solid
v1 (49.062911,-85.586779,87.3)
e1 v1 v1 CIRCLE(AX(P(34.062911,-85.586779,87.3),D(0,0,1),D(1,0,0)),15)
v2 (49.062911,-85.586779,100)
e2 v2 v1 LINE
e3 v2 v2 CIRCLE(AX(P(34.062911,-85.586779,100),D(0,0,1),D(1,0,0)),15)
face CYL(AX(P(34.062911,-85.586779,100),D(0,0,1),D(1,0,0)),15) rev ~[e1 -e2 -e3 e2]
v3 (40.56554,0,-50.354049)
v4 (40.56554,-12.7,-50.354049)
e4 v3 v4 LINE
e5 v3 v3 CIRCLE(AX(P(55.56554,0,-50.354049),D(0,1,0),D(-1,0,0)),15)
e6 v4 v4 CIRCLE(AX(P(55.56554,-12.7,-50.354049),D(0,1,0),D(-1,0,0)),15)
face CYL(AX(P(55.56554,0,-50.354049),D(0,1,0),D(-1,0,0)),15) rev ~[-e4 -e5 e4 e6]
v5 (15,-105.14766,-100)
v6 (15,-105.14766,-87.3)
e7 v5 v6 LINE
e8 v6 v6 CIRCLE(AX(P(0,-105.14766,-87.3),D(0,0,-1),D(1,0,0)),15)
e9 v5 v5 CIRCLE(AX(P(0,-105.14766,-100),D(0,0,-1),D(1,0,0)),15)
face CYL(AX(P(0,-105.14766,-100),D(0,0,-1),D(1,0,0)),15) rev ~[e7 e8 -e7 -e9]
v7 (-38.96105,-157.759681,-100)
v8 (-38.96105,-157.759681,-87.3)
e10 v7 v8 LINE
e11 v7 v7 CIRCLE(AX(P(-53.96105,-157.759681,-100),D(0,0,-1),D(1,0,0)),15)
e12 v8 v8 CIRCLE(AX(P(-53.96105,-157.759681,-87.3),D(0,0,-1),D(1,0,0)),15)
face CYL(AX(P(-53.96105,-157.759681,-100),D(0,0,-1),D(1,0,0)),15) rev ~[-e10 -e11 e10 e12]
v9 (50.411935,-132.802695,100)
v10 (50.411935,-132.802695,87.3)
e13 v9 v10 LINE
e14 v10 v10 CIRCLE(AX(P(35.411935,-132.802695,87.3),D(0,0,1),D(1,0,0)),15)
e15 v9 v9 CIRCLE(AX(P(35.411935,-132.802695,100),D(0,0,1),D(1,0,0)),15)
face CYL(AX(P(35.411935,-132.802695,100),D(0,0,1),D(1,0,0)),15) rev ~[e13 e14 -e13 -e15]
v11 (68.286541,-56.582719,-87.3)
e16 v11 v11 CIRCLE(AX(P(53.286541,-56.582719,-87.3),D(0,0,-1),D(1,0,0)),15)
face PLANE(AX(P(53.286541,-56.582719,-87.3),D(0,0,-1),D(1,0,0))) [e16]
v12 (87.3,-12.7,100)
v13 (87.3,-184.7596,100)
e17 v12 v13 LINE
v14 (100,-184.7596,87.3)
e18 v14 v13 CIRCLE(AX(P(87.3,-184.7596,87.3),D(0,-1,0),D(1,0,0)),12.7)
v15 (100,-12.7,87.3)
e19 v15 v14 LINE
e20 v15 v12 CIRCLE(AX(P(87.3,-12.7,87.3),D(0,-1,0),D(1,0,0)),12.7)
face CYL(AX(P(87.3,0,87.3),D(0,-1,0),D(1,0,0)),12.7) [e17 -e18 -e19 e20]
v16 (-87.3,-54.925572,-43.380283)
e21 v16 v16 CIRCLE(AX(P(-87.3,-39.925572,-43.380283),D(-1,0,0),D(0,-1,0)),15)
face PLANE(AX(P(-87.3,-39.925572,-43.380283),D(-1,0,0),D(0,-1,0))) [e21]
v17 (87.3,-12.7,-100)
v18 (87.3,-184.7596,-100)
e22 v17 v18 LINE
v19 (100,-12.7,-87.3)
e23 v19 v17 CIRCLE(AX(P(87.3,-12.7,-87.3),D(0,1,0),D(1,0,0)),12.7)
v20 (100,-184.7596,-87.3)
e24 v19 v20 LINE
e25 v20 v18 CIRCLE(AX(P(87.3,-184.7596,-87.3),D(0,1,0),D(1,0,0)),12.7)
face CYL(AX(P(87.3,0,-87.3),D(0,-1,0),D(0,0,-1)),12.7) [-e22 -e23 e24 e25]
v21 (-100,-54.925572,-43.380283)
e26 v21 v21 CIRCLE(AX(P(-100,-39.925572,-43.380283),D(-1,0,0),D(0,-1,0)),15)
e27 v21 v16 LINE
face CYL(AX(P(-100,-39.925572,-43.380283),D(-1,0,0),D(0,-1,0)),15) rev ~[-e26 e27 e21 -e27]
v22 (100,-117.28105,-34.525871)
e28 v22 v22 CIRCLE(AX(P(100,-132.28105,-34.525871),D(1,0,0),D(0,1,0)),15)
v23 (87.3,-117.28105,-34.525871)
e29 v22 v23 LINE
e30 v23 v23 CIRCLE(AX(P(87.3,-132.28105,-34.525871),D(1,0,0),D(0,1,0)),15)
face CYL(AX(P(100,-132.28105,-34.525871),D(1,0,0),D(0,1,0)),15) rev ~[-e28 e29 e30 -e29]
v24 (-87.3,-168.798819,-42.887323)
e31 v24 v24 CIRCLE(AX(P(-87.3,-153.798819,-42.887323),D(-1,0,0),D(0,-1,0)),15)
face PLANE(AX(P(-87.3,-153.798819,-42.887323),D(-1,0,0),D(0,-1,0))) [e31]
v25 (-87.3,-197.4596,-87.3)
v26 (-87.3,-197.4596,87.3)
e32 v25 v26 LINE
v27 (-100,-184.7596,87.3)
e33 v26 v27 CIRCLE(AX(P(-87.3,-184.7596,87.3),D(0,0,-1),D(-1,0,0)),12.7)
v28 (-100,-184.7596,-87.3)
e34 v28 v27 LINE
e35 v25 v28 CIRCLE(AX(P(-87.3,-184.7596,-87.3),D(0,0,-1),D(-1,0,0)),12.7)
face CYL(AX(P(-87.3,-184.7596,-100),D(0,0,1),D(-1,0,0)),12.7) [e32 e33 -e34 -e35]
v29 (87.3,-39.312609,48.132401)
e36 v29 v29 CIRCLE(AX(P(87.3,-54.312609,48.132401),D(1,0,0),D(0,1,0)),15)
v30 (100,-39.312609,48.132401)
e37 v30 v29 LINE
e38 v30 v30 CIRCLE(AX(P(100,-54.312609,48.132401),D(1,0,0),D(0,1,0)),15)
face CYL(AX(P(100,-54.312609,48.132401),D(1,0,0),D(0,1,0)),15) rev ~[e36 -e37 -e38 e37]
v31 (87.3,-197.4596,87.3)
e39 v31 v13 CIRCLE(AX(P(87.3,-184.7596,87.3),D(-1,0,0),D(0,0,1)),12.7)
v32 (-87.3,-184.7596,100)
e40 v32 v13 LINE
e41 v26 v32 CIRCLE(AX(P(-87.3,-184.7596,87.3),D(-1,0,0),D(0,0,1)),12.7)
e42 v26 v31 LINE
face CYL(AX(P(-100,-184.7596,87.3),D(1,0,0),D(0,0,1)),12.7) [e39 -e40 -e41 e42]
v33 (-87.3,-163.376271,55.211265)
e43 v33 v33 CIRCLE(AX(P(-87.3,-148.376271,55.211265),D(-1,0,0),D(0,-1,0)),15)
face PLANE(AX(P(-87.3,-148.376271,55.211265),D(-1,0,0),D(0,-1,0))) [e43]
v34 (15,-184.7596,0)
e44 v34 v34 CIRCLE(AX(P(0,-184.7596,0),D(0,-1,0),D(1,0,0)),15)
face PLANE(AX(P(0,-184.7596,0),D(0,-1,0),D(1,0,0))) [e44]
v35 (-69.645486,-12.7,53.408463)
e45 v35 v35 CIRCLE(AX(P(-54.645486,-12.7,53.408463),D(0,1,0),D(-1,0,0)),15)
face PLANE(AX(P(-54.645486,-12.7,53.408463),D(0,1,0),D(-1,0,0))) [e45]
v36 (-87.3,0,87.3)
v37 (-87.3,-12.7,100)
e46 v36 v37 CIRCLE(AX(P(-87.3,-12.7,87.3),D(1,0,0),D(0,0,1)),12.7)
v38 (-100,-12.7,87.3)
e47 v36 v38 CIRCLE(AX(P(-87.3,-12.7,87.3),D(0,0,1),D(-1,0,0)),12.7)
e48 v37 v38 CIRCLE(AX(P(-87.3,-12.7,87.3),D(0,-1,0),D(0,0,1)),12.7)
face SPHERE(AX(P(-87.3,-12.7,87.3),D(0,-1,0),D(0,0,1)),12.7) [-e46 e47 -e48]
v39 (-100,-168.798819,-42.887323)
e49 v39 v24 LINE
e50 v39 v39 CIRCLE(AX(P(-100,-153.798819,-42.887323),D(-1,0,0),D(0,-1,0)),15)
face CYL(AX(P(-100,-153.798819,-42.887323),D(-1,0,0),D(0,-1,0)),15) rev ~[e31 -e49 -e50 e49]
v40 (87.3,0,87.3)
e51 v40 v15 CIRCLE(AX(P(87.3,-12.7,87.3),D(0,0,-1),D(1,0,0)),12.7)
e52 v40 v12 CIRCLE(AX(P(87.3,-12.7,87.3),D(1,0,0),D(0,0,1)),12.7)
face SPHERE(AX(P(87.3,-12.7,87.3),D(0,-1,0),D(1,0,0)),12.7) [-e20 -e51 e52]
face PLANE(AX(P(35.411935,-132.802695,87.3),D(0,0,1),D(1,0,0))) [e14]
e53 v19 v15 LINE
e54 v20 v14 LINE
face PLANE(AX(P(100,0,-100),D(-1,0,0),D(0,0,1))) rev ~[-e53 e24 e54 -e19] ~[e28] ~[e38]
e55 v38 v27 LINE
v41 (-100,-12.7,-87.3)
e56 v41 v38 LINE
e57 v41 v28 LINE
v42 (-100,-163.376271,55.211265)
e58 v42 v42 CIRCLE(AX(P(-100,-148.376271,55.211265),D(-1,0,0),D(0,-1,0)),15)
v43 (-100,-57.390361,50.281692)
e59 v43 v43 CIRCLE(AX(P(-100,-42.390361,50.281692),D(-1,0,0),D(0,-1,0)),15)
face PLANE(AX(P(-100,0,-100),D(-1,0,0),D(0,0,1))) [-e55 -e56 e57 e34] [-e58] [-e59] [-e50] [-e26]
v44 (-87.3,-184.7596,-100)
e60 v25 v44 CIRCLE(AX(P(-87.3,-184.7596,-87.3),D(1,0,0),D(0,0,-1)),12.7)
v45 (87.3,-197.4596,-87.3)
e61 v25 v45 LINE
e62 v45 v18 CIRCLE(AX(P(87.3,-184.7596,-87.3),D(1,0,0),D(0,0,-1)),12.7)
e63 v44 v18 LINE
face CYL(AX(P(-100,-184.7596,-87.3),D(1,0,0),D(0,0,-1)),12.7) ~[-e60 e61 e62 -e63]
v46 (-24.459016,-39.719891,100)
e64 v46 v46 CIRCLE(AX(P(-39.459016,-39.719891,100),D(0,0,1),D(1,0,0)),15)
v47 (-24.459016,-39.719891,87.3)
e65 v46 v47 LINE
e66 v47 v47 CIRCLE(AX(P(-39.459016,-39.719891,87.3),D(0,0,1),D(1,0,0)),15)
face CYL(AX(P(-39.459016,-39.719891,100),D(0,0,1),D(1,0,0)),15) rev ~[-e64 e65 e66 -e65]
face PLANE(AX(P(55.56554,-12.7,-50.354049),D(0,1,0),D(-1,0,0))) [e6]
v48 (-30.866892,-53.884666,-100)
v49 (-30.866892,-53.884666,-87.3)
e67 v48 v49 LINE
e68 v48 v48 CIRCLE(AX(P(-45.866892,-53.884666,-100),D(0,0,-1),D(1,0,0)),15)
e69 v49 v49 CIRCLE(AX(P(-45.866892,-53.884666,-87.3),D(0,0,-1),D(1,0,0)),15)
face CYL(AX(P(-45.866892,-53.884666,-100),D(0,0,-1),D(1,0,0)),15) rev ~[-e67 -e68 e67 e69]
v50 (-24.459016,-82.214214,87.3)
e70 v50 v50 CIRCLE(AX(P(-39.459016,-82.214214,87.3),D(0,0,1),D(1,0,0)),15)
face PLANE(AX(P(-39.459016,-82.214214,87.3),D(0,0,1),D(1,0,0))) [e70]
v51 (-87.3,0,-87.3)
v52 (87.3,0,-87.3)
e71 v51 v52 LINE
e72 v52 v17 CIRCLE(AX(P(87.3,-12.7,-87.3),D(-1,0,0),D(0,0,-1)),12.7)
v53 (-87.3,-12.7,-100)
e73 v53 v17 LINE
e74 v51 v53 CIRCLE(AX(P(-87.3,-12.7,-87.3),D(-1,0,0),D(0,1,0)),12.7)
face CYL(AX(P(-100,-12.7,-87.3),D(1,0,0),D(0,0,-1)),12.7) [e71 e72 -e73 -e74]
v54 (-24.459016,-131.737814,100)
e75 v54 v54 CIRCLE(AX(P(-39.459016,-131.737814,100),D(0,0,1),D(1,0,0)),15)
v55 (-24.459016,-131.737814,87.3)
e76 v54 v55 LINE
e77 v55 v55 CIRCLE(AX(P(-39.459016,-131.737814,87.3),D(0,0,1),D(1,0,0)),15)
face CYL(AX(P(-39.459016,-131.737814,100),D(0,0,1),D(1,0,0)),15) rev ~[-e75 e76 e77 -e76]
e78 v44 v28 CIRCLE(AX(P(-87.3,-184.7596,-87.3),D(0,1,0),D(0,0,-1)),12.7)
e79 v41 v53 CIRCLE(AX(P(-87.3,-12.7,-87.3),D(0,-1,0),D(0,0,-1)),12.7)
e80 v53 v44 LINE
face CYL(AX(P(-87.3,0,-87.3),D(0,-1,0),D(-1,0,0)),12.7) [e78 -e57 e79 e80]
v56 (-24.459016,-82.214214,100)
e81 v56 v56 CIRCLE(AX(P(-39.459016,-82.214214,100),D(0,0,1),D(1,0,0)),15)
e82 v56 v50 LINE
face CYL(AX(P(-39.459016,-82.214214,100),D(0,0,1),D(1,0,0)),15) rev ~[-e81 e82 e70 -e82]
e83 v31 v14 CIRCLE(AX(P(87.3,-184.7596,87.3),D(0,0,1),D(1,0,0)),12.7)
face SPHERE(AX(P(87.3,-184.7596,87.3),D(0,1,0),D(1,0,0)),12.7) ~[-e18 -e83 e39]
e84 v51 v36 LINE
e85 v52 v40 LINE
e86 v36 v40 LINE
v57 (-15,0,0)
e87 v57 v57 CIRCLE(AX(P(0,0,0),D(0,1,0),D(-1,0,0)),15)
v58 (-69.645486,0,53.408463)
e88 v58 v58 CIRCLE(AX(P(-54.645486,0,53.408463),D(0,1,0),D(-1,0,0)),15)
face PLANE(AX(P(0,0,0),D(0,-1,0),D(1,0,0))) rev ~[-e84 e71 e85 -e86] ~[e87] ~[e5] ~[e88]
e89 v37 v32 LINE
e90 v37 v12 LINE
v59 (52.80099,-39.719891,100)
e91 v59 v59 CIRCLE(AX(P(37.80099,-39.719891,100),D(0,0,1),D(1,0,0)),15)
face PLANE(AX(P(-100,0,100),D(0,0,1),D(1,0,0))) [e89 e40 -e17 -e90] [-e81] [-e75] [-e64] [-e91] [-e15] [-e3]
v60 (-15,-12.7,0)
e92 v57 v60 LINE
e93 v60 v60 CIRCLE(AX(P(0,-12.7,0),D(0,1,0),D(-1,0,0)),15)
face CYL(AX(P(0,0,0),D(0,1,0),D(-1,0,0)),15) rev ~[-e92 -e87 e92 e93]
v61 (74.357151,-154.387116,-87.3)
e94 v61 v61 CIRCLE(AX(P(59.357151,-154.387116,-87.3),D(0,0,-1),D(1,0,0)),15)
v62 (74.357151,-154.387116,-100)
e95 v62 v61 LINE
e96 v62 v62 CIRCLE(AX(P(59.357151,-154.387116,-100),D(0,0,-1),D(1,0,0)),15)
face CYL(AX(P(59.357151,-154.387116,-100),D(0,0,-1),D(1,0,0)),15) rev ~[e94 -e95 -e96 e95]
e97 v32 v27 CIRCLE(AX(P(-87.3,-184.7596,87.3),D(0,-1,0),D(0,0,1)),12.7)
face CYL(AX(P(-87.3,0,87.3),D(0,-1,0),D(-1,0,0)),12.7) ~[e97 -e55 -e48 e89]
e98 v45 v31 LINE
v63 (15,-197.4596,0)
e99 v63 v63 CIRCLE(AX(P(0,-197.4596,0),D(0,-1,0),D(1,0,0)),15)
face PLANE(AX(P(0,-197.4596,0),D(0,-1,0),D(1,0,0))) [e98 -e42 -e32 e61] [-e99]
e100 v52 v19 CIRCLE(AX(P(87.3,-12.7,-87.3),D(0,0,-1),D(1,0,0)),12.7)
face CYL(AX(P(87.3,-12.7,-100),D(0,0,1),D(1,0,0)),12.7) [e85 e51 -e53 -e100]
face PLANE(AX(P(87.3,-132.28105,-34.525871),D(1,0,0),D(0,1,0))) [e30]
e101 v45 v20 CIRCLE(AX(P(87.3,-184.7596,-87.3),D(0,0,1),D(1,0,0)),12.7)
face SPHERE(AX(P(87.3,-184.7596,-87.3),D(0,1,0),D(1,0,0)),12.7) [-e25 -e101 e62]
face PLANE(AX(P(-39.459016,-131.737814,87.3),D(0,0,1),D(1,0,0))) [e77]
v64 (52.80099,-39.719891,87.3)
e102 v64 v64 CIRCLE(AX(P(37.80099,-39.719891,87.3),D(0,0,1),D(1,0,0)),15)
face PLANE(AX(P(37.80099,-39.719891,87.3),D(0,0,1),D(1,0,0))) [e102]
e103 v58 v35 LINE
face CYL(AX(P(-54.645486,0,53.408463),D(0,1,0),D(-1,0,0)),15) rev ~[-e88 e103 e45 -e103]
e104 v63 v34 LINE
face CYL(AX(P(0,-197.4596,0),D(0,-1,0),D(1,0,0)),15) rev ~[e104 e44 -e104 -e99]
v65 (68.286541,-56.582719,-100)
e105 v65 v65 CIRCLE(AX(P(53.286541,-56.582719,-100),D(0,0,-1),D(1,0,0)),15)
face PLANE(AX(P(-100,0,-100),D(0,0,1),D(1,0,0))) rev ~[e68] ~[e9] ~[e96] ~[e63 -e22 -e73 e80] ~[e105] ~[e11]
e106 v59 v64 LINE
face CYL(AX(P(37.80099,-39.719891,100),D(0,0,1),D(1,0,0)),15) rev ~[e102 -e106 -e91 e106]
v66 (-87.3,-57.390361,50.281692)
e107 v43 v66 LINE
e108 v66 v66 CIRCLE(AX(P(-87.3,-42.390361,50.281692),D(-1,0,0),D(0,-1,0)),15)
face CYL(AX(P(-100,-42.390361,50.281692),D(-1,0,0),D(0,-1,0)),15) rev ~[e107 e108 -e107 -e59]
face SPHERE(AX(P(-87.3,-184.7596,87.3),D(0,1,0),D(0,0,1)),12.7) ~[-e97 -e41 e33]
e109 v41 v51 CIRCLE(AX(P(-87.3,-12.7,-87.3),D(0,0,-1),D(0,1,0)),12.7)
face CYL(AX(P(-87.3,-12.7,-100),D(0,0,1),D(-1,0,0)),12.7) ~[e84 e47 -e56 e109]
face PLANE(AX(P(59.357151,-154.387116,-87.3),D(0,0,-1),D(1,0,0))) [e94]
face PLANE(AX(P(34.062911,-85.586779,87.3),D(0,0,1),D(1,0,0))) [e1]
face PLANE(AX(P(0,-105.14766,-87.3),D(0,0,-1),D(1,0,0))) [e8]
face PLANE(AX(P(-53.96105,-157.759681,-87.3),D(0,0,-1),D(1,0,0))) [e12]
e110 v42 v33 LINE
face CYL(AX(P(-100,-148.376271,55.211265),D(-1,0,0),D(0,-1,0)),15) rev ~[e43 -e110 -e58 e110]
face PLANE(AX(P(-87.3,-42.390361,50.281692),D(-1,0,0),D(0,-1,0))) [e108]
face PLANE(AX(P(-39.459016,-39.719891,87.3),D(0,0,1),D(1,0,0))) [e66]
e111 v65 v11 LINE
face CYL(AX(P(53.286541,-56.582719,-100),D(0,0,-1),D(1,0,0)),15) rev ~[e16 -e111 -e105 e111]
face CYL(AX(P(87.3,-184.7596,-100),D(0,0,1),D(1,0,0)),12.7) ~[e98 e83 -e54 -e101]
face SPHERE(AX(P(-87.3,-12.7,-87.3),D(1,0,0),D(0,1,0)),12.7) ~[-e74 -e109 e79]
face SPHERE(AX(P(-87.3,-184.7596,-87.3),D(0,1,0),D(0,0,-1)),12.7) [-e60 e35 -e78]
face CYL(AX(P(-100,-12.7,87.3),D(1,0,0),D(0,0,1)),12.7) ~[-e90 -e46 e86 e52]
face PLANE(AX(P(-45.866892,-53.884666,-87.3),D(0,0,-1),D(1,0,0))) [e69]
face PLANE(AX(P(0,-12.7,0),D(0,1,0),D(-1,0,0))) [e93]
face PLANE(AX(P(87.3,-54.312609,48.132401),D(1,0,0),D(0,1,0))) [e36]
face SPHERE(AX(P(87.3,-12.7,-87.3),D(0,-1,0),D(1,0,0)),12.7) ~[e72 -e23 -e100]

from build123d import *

# Parameters (mm, degrees)
F0_W      = 200
F0_H      = 200
F1_DEPTH  = 197.4596
F2_R      = 12.7
F3_R      = 15
F4_DEPTH  = 12.7
F6_R      = 15
F7_DEPTH  = 12.7
F5_R      = 15
F8_DEPTH  = 12.7
F9_R      = 15
F10_DEPTH = 12.7
F11_R     = 15
F12_DEPTH = 12.7
F13_R     = 15
F14_DEPTH = 12.7


# Not quite as in the source:
# - a feature names something its author has since deleted; it is built from what else it names


with BuildPart() as f1:
    # F0 (on Front) → F1 (new body)
    with BuildSketch(Plane.XZ):
        Rectangle(F0_W, F0_H)
    extrude(amount=F1_DEPTH)

    # F2
    f2_edges = [f1.edges().sort_by_distance(p)[0] for p in [
        (100, -98.7298, -100),
        (100, -98.7298, 100),
        (100, 0, 0),
        (100, -197.4596, 0),
        (-100, -98.7298, 100),
        (0, 0, 100),
        (0, -197.4596, 100),
        (0, 0, -100),
        (-100, 0, 0),
        (-100, -98.7298, -100),
        (0, -197.4596, -100),
        (-100, -197.4596, 0),
    ]]
    fillet(f2_edges, radius=F2_R)

    # F3 (on face) → F4 (cut)
    with BuildSketch(Plane.XZ.offset(197.4596)):
        Circle(F3_R)
    extrude(amount=-F4_DEPTH, mode=Mode.SUBTRACT)

    # F6 (on face) → F7 (cut)
    with BuildSketch(Plane(origin=(0, 0, 0), x_dir=(-1, 0, 0), z_dir=(0, 1, 0))):
        with Locations((54.645486176, 53.4084625542)):
            Circle(F6_R)
        Circle(F6_R)
        with Locations((-55.5655397475, -50.3540486097)):
            Circle(F6_R)
    extrude(amount=-F7_DEPTH, mode=Mode.SUBTRACT)

    # F5 (on face) → F8 (cut)
    with BuildSketch(Plane.YZ.offset(100)):
        with Locations((-132.281050086, -34.5258712769)):
            Circle(F5_R)
        with Locations((-54.3126091361, 48.1324009597)):
            Circle(F5_R)
    extrude(amount=-F8_DEPTH, mode=Mode.SUBTRACT)

    # F9 (on face) → F10 (cut)
    with BuildSketch(Plane(origin=(-100, 0, 0), x_dir=(0, -1, 0), z_dir=(-1, 0, 0))):
        with Locations((42.3903614283, 50.2816922963)):
            Circle(F9_R)
        with Locations((39.9255715311, -43.3802828193)):
            Circle(F9_R)
        with Locations((148.3762711287, 55.2112646401)):
            Circle(F9_R)
        with Locations((153.7988185883, -42.8873226047)):
            Circle(F9_R)
    extrude(amount=-F10_DEPTH, mode=Mode.SUBTRACT)

    # F11 (on face) → F12 (cut)
    with BuildSketch(Plane(origin=(0, 0, -100), x_dir=(1, 0, 0), z_dir=(0, 0, -1))):
        with Locations((0, 105.1476597786)):
            Circle(F11_R)
        with Locations((53.2865412533, 56.5827190876)):
            Circle(F11_R)
        with Locations((-45.8668917418, 53.8846664131)):
            Circle(F11_R)
        with Locations((-53.9610497653, 157.759681344)):
            Circle(F11_R)
        with Locations((59.3571513891, 154.3871164322)):
            Circle(F11_R)
    extrude(amount=-F12_DEPTH, mode=Mode.SUBTRACT)

    # F13 (on face) → F14 (cut)
    with BuildSketch(Plane.XY.offset(100)):
        with Locations((-39.4590161741, -39.7198908031)):
            Circle(F13_R)
        with Locations((37.8009901579, -39.7198908031)):
            Circle(F13_R)
        with Locations((-39.4590161741, -82.2142139077)):
            Circle(F13_R)
        with Locations((34.062910825, -85.5867788196)):
            Circle(F13_R)
        with Locations((-39.4590161741, -131.7378137109)):
            Circle(F13_R)
        with Locations((35.4119352996, -132.8026950359)):
            Circle(F13_R)
    extrude(amount=-F14_DEPTH, mode=Mode.SUBTRACT)


solid = f1.part
